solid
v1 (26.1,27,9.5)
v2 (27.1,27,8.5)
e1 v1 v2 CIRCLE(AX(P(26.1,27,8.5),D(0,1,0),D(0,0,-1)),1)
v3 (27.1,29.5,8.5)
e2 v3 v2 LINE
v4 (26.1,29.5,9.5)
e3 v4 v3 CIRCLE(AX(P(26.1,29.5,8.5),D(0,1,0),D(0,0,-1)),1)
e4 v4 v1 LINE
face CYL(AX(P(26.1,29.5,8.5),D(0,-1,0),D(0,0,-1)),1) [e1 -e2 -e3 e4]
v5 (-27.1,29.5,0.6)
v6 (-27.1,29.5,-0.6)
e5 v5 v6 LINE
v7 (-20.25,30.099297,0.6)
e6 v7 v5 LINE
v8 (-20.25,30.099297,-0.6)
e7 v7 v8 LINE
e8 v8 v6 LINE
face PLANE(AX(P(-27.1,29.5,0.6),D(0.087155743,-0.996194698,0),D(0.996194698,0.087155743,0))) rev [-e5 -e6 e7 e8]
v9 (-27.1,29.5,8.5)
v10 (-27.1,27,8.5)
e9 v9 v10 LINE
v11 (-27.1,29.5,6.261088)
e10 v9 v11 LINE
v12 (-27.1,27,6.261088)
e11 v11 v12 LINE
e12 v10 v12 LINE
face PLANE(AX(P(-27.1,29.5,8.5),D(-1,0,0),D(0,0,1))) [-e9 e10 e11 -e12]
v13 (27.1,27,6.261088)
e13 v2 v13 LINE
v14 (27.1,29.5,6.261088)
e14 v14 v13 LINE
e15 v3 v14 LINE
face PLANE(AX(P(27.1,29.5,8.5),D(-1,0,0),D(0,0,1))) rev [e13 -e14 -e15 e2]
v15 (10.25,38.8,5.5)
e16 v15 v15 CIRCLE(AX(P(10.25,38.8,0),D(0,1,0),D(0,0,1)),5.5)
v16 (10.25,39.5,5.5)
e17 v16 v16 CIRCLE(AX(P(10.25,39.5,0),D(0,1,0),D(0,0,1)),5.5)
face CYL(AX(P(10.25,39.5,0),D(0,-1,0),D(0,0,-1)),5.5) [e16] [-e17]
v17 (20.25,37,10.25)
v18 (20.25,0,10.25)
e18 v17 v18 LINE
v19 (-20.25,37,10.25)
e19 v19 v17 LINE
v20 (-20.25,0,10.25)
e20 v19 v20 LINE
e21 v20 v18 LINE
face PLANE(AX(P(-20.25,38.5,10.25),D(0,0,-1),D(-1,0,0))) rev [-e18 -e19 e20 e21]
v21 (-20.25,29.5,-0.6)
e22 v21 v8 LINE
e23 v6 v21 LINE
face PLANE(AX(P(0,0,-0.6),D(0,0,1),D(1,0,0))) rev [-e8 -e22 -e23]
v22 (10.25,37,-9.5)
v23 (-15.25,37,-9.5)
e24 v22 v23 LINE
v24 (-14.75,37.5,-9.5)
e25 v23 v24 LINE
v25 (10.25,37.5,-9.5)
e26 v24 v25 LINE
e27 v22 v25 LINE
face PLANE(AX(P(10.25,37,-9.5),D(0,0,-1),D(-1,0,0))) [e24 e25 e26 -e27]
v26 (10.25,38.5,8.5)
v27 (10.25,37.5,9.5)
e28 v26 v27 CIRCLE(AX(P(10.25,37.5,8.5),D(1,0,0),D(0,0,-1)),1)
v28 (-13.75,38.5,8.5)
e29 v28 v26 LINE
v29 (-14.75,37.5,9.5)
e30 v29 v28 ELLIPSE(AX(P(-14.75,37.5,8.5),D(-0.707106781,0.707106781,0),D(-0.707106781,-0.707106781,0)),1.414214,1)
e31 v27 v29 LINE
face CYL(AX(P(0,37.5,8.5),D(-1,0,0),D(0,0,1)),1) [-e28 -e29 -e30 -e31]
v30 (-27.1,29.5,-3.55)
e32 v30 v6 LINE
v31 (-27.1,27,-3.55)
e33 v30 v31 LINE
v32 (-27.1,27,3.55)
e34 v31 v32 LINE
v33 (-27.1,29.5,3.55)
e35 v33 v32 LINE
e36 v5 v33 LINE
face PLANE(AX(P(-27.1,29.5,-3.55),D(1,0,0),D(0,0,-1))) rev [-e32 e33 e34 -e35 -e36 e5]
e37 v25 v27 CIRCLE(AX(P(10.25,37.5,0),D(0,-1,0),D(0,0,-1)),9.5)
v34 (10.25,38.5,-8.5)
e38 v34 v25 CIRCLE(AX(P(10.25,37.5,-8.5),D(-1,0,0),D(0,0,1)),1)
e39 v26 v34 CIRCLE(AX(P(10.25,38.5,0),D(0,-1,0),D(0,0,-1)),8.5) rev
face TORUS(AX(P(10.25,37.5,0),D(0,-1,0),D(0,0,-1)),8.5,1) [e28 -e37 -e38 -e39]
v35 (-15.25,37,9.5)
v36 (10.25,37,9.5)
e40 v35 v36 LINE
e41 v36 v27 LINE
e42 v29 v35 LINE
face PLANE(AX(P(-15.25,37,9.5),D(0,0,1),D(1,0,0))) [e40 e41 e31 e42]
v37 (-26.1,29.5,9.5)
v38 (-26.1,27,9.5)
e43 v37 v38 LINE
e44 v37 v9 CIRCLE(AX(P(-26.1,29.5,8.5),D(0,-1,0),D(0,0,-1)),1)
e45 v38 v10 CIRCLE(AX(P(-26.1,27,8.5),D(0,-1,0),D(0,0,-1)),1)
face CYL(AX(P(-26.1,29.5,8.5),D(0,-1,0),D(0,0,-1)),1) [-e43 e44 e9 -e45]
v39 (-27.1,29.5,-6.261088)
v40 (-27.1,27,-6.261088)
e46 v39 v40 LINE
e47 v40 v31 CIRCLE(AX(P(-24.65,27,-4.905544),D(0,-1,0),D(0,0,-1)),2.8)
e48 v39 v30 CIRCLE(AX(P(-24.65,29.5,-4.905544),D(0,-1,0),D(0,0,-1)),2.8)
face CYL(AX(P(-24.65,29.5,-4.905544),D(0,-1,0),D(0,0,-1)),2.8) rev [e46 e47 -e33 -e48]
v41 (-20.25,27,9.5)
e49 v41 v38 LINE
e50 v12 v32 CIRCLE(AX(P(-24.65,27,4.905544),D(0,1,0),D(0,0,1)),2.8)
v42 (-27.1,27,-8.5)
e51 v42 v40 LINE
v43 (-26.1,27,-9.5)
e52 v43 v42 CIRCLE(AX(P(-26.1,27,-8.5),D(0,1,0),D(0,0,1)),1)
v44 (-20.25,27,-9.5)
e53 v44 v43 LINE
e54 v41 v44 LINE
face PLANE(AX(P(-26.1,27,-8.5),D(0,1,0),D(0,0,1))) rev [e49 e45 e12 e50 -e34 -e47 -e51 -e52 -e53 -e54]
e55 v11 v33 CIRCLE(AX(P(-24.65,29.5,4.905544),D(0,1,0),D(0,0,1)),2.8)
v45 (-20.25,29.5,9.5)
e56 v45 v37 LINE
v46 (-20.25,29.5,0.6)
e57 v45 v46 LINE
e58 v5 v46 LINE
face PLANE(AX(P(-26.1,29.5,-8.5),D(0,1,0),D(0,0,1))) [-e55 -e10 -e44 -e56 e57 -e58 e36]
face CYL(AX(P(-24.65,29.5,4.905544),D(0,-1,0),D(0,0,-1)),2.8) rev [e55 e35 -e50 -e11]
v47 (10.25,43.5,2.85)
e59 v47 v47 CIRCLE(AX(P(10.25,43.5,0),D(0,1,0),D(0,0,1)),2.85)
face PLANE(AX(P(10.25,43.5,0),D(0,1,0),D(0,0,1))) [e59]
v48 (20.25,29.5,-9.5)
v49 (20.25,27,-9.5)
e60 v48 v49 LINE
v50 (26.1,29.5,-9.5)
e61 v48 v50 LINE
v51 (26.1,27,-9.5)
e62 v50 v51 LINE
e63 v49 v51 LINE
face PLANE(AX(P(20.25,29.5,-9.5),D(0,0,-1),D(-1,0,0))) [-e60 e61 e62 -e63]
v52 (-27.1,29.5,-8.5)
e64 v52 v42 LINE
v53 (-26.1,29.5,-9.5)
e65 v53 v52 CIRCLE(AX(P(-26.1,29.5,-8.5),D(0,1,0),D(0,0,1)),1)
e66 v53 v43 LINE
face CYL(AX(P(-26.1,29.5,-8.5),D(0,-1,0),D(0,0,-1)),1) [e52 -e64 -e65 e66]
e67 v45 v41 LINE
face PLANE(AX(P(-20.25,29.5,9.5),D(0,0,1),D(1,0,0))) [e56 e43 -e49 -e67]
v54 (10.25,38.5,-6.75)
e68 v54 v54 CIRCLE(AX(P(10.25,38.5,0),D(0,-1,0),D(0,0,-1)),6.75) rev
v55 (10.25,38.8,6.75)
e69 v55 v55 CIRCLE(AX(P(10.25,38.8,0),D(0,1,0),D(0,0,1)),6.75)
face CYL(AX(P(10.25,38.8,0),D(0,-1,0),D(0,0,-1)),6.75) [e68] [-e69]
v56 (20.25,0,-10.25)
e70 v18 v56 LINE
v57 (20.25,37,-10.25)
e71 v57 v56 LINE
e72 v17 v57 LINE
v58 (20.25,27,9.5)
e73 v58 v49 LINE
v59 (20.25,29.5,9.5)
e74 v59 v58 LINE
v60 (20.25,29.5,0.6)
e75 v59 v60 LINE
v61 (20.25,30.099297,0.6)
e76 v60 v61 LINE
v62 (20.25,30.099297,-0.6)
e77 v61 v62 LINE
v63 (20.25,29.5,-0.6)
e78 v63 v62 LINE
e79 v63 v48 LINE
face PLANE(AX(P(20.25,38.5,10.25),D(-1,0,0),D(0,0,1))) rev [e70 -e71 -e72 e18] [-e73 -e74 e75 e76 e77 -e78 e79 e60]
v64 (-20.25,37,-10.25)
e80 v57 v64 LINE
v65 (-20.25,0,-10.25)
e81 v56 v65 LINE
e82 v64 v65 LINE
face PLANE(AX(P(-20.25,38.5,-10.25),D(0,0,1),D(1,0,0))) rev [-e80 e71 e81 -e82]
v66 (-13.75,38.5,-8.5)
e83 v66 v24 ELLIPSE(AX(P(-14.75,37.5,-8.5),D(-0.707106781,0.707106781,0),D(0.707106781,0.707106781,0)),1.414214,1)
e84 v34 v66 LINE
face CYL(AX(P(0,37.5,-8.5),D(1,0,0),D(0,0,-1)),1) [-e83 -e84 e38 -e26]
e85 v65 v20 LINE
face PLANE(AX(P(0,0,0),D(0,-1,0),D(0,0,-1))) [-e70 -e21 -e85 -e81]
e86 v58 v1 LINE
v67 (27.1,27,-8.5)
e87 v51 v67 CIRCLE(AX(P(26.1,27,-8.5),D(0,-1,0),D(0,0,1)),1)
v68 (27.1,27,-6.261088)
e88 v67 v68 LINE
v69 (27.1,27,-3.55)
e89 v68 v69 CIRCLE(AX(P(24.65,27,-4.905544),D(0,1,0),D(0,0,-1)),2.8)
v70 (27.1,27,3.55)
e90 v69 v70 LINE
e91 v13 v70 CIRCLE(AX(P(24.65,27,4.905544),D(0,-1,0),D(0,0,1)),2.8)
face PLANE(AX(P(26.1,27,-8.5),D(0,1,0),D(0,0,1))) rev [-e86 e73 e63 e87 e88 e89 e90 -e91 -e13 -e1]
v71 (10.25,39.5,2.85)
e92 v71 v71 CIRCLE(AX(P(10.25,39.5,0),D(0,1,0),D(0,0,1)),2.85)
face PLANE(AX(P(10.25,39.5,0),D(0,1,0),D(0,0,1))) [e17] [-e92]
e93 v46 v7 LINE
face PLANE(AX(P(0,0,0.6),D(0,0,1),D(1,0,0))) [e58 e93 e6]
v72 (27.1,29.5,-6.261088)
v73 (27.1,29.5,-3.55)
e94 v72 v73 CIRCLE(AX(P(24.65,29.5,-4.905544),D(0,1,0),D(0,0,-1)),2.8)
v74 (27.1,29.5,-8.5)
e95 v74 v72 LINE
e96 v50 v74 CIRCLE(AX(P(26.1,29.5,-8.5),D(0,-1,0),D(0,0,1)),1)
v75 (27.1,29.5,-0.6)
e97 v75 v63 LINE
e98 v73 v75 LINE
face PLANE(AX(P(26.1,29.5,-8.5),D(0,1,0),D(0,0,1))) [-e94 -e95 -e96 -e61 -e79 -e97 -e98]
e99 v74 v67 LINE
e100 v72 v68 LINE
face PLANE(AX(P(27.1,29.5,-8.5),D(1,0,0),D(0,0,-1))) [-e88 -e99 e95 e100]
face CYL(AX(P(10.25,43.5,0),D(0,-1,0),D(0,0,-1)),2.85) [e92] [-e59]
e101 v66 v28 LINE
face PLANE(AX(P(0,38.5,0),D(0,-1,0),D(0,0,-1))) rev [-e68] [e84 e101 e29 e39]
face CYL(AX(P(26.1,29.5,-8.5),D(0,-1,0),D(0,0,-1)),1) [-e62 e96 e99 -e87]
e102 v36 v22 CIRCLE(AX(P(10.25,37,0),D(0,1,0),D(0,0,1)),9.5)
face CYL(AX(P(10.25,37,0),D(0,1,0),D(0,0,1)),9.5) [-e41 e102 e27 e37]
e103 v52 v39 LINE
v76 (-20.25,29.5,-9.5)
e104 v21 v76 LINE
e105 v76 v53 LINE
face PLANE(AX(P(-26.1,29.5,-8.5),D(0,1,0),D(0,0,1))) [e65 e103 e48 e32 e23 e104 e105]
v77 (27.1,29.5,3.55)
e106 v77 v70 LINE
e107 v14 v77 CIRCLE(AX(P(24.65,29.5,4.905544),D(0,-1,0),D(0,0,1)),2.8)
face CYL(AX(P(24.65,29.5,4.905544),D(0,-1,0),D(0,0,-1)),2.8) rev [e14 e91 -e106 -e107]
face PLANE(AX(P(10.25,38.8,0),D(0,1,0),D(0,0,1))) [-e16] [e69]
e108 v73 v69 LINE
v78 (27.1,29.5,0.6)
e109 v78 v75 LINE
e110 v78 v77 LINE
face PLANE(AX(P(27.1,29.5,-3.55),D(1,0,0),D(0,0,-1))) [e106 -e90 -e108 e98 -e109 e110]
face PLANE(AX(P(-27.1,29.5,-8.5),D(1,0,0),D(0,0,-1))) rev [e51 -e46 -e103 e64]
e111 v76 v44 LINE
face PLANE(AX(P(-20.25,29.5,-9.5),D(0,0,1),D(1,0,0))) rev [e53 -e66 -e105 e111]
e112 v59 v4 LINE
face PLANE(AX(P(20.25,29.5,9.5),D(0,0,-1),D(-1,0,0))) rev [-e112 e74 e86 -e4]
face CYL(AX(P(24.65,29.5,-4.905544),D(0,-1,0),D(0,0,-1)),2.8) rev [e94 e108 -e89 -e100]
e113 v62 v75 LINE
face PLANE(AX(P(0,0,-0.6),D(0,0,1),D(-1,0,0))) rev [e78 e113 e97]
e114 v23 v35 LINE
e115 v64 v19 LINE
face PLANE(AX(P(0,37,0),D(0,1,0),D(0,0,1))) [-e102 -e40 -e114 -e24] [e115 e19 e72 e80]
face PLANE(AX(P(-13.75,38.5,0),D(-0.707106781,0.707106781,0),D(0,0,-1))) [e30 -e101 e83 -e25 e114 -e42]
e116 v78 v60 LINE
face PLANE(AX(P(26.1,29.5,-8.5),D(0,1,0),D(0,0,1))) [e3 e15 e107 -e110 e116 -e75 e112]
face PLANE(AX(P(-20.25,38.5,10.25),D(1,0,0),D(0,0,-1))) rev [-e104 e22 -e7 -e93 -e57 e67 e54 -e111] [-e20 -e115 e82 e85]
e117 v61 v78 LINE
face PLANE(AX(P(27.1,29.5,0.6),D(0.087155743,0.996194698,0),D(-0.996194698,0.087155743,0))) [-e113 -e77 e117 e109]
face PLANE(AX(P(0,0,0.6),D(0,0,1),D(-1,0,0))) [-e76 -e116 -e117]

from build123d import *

# Parameters (mm, degrees)
CROQUIS1_W              = 40.5
CROQUIS1_H              = 20.5
SALIENTE_EXTRUIR1_DEPTH = 38.5
SALIENTE_EXTRUIR2_START = -11.5
SALIENTE_EXTRUIR2_DEPTH = 2.5
SALIENTE_EXTRUIR6_DEPTH = 0.6
SIMETR_A2_START         = -11.5
SIMETR_A2_COPY_1_DEPTH  = 2.5
CROQUIS4_W              = 40.5
CROQUIS4_H              = 20.5
CORTAR_EXTRUIR3_DEPTH   = 1.5
CHAFL_N1_SIZE           = 1.5
REDONDEO1_R             = 1
CROQUIS5_R              = 6.75
SALIENTE_EXTRUIR3_DEPTH = 0.3
CROQUIS6_R              = 5.5
SALIENTE_EXTRUIR4_DEPTH = 0.7
CROQUIS7_R              = 2.85
SALIENTE_EXTRUIR5_DEPTH = 4


with BuildPart() as part:
    # Croquis1 → Saliente-Extruir1 (new body)
    with BuildSketch(Plane(origin=(0, 0, 0), x_dir=(1, 0, 0), z_dir=(0, 1, 0))):
        Rectangle(CROQUIS1_W, CROQUIS1_H)
    extrude(amount=SALIENTE_EXTRUIR1_DEPTH)

    # Croquis2 → Saliente-Extruir2 (add)
    with BuildSketch(Plane(origin=(0, 38.5, 0), x_dir=(1, 0, 0), z_dir=(0, 1, 0)).offset(SALIENTE_EXTRUIR2_START)):
        with BuildLine():
            Line((-20.25, 9.5), (-26.1, 9.5))
            ThreePointArc((-26.1, 9.5), (-26.807106781, 9.207106781), (-27.1, 8.5))
            Line((-27.1, 8.5), (-27.1, 6.261088342))
            ThreePointArc((-27.1, 6.261088342), (-21.85, 4.905544171), (-27.1, 3.55))
            Line((-27.1, 3.55), (-27.1, 0))
            Line((-27.1, 0), (-20.25, 0))
            Line((-20.25, 0), (-20.25, 9.5))
        make_face()
    saliente_extruir2 = extrude(amount=SALIENTE_EXTRUIR2_DEPTH)

    # Simetría1: Saliente-Extruir2 across plane
    add(saliente_extruir2.mirror(Plane(origin=(0, 0, 0), x_dir=(1, 0, 0), z_dir=(0, 0, -1))))

    # Croquis8 → Saliente-Extruir6 (add, symmetric)
    with BuildSketch(Plane.XY):
        Polygon((-27.1, 29.5), (-20.25, 30.099297345), (-20.25, 29.5), align=None)
    saliente_extruir6 = extrude(amount=SALIENTE_EXTRUIR6_DEPTH, both=True)

    # Simetría2: Saliente-Extruir2, Saliente-Extruir6 across plane
    add(saliente_extruir2.mirror(Plane(origin=(0, 0, 0), x_dir=(0, 0, 1), z_dir=(1, 0, 0))))
    add(saliente_extruir6.mirror(Plane(origin=(0, 0, 0), x_dir=(0, 0, 1), z_dir=(1, 0, 0))))

    # Simetría2 copy 1 sketch → Simetría2 copy 1 (add)
    with BuildSketch(Plane(origin=(0, 38.5, 0), x_dir=(-1, 0, 0), z_dir=(0, 1, 0)).offset(SIMETR_A2_START)):
        with BuildLine():
            Line((-20.25, 9.5), (-26.1, 9.5))
            ThreePointArc((-26.1, 9.5), (-26.807106781, 9.207106781), (-27.1, 8.5))
            Line((-27.1, 8.5), (-27.1, 6.261088342))
            ThreePointArc((-27.1, 6.261088342), (-21.85, 4.905544171), (-27.1, 3.55))
            Line((-27.1, 3.55), (-27.1, 0))
            Line((-27.1, 0), (-20.25, 0))
            Line((-20.25, 0), (-20.25, 9.5))
        make_face()
    extrude(amount=SIMETR_A2_COPY_1_DEPTH)

    # Croquis4 → Cortar-Extruir3 (cut)
    with BuildSketch(Plane(origin=(0, 38.5, 0), x_dir=(1, 0, 0), z_dir=(0, 1, 0))):
        Rectangle(CROQUIS4_W, CROQUIS4_H)
        with BuildLine():
            Line((-15.25, 9.5), (-15.25, -9.5))
            Line((-15.25, -9.5), (10.25, -9.5))
            ThreePointArc((10.25, -9.5), (19.75, 0), (10.25, 9.5))
            Line((10.25, 9.5), (-15.25, 9.5))
        make_face(mode=Mode.SUBTRACT)
    extrude(amount=-CORTAR_EXTRUIR3_DEPTH, mode=Mode.SUBTRACT)

    # Chaflán1
    chafl_n1_edges = [part.edges().sort_by_distance(p)[0] for p in [
        (-15.25, 38.5, 0),
    ]]
    chamfer(chafl_n1_edges, length=CHAFL_N1_SIZE - 0.0001)  # a hair under: the kernel refuses the full size

    # Redondeo1
    redondeo1_edges = [part.edges().sort_by_distance(p)[0] for p in [
        (-1.75005, 38.5, -9.5),
        (19.75, 38.5, 0),
        (-1.75005, 38.5, 9.5),
    ]]
    fillet(redondeo1_edges, radius=REDONDEO1_R)

    # Croquis5 → Saliente-Extruir3 (add)
    with BuildSketch(Plane(origin=(0, 38.5, 0), x_dir=(1, 0, 0), z_dir=(0, 1, 0))):
        with Locations(Location((10.25, 0, 0), (0, 0, 90))):
            Circle(CROQUIS5_R)
    extrude(amount=SALIENTE_EXTRUIR3_DEPTH)

    # Croquis6 → Saliente-Extruir4 (add)
    with BuildSketch(Plane(origin=(0, 38.8, 0), x_dir=(1, 0, 0), z_dir=(0, 1, 0))):
        with Locations(Location((10.25, 0, 0), (0, 0, 270))):
            Circle(CROQUIS6_R)
    extrude(amount=SALIENTE_EXTRUIR4_DEPTH)

    # Croquis7 → Saliente-Extruir5 (add)
    with BuildSketch(Plane(origin=(0, 39.5, 0), x_dir=(1, 0, 0), z_dir=(0, 1, 0))):
        with Locations(Location((10.25, 0, 0), (0, 0, 270))):
            Circle(CROQUIS7_R)
    extrude(amount=SALIENTE_EXTRUIR5_DEPTH)


solid = part.part
